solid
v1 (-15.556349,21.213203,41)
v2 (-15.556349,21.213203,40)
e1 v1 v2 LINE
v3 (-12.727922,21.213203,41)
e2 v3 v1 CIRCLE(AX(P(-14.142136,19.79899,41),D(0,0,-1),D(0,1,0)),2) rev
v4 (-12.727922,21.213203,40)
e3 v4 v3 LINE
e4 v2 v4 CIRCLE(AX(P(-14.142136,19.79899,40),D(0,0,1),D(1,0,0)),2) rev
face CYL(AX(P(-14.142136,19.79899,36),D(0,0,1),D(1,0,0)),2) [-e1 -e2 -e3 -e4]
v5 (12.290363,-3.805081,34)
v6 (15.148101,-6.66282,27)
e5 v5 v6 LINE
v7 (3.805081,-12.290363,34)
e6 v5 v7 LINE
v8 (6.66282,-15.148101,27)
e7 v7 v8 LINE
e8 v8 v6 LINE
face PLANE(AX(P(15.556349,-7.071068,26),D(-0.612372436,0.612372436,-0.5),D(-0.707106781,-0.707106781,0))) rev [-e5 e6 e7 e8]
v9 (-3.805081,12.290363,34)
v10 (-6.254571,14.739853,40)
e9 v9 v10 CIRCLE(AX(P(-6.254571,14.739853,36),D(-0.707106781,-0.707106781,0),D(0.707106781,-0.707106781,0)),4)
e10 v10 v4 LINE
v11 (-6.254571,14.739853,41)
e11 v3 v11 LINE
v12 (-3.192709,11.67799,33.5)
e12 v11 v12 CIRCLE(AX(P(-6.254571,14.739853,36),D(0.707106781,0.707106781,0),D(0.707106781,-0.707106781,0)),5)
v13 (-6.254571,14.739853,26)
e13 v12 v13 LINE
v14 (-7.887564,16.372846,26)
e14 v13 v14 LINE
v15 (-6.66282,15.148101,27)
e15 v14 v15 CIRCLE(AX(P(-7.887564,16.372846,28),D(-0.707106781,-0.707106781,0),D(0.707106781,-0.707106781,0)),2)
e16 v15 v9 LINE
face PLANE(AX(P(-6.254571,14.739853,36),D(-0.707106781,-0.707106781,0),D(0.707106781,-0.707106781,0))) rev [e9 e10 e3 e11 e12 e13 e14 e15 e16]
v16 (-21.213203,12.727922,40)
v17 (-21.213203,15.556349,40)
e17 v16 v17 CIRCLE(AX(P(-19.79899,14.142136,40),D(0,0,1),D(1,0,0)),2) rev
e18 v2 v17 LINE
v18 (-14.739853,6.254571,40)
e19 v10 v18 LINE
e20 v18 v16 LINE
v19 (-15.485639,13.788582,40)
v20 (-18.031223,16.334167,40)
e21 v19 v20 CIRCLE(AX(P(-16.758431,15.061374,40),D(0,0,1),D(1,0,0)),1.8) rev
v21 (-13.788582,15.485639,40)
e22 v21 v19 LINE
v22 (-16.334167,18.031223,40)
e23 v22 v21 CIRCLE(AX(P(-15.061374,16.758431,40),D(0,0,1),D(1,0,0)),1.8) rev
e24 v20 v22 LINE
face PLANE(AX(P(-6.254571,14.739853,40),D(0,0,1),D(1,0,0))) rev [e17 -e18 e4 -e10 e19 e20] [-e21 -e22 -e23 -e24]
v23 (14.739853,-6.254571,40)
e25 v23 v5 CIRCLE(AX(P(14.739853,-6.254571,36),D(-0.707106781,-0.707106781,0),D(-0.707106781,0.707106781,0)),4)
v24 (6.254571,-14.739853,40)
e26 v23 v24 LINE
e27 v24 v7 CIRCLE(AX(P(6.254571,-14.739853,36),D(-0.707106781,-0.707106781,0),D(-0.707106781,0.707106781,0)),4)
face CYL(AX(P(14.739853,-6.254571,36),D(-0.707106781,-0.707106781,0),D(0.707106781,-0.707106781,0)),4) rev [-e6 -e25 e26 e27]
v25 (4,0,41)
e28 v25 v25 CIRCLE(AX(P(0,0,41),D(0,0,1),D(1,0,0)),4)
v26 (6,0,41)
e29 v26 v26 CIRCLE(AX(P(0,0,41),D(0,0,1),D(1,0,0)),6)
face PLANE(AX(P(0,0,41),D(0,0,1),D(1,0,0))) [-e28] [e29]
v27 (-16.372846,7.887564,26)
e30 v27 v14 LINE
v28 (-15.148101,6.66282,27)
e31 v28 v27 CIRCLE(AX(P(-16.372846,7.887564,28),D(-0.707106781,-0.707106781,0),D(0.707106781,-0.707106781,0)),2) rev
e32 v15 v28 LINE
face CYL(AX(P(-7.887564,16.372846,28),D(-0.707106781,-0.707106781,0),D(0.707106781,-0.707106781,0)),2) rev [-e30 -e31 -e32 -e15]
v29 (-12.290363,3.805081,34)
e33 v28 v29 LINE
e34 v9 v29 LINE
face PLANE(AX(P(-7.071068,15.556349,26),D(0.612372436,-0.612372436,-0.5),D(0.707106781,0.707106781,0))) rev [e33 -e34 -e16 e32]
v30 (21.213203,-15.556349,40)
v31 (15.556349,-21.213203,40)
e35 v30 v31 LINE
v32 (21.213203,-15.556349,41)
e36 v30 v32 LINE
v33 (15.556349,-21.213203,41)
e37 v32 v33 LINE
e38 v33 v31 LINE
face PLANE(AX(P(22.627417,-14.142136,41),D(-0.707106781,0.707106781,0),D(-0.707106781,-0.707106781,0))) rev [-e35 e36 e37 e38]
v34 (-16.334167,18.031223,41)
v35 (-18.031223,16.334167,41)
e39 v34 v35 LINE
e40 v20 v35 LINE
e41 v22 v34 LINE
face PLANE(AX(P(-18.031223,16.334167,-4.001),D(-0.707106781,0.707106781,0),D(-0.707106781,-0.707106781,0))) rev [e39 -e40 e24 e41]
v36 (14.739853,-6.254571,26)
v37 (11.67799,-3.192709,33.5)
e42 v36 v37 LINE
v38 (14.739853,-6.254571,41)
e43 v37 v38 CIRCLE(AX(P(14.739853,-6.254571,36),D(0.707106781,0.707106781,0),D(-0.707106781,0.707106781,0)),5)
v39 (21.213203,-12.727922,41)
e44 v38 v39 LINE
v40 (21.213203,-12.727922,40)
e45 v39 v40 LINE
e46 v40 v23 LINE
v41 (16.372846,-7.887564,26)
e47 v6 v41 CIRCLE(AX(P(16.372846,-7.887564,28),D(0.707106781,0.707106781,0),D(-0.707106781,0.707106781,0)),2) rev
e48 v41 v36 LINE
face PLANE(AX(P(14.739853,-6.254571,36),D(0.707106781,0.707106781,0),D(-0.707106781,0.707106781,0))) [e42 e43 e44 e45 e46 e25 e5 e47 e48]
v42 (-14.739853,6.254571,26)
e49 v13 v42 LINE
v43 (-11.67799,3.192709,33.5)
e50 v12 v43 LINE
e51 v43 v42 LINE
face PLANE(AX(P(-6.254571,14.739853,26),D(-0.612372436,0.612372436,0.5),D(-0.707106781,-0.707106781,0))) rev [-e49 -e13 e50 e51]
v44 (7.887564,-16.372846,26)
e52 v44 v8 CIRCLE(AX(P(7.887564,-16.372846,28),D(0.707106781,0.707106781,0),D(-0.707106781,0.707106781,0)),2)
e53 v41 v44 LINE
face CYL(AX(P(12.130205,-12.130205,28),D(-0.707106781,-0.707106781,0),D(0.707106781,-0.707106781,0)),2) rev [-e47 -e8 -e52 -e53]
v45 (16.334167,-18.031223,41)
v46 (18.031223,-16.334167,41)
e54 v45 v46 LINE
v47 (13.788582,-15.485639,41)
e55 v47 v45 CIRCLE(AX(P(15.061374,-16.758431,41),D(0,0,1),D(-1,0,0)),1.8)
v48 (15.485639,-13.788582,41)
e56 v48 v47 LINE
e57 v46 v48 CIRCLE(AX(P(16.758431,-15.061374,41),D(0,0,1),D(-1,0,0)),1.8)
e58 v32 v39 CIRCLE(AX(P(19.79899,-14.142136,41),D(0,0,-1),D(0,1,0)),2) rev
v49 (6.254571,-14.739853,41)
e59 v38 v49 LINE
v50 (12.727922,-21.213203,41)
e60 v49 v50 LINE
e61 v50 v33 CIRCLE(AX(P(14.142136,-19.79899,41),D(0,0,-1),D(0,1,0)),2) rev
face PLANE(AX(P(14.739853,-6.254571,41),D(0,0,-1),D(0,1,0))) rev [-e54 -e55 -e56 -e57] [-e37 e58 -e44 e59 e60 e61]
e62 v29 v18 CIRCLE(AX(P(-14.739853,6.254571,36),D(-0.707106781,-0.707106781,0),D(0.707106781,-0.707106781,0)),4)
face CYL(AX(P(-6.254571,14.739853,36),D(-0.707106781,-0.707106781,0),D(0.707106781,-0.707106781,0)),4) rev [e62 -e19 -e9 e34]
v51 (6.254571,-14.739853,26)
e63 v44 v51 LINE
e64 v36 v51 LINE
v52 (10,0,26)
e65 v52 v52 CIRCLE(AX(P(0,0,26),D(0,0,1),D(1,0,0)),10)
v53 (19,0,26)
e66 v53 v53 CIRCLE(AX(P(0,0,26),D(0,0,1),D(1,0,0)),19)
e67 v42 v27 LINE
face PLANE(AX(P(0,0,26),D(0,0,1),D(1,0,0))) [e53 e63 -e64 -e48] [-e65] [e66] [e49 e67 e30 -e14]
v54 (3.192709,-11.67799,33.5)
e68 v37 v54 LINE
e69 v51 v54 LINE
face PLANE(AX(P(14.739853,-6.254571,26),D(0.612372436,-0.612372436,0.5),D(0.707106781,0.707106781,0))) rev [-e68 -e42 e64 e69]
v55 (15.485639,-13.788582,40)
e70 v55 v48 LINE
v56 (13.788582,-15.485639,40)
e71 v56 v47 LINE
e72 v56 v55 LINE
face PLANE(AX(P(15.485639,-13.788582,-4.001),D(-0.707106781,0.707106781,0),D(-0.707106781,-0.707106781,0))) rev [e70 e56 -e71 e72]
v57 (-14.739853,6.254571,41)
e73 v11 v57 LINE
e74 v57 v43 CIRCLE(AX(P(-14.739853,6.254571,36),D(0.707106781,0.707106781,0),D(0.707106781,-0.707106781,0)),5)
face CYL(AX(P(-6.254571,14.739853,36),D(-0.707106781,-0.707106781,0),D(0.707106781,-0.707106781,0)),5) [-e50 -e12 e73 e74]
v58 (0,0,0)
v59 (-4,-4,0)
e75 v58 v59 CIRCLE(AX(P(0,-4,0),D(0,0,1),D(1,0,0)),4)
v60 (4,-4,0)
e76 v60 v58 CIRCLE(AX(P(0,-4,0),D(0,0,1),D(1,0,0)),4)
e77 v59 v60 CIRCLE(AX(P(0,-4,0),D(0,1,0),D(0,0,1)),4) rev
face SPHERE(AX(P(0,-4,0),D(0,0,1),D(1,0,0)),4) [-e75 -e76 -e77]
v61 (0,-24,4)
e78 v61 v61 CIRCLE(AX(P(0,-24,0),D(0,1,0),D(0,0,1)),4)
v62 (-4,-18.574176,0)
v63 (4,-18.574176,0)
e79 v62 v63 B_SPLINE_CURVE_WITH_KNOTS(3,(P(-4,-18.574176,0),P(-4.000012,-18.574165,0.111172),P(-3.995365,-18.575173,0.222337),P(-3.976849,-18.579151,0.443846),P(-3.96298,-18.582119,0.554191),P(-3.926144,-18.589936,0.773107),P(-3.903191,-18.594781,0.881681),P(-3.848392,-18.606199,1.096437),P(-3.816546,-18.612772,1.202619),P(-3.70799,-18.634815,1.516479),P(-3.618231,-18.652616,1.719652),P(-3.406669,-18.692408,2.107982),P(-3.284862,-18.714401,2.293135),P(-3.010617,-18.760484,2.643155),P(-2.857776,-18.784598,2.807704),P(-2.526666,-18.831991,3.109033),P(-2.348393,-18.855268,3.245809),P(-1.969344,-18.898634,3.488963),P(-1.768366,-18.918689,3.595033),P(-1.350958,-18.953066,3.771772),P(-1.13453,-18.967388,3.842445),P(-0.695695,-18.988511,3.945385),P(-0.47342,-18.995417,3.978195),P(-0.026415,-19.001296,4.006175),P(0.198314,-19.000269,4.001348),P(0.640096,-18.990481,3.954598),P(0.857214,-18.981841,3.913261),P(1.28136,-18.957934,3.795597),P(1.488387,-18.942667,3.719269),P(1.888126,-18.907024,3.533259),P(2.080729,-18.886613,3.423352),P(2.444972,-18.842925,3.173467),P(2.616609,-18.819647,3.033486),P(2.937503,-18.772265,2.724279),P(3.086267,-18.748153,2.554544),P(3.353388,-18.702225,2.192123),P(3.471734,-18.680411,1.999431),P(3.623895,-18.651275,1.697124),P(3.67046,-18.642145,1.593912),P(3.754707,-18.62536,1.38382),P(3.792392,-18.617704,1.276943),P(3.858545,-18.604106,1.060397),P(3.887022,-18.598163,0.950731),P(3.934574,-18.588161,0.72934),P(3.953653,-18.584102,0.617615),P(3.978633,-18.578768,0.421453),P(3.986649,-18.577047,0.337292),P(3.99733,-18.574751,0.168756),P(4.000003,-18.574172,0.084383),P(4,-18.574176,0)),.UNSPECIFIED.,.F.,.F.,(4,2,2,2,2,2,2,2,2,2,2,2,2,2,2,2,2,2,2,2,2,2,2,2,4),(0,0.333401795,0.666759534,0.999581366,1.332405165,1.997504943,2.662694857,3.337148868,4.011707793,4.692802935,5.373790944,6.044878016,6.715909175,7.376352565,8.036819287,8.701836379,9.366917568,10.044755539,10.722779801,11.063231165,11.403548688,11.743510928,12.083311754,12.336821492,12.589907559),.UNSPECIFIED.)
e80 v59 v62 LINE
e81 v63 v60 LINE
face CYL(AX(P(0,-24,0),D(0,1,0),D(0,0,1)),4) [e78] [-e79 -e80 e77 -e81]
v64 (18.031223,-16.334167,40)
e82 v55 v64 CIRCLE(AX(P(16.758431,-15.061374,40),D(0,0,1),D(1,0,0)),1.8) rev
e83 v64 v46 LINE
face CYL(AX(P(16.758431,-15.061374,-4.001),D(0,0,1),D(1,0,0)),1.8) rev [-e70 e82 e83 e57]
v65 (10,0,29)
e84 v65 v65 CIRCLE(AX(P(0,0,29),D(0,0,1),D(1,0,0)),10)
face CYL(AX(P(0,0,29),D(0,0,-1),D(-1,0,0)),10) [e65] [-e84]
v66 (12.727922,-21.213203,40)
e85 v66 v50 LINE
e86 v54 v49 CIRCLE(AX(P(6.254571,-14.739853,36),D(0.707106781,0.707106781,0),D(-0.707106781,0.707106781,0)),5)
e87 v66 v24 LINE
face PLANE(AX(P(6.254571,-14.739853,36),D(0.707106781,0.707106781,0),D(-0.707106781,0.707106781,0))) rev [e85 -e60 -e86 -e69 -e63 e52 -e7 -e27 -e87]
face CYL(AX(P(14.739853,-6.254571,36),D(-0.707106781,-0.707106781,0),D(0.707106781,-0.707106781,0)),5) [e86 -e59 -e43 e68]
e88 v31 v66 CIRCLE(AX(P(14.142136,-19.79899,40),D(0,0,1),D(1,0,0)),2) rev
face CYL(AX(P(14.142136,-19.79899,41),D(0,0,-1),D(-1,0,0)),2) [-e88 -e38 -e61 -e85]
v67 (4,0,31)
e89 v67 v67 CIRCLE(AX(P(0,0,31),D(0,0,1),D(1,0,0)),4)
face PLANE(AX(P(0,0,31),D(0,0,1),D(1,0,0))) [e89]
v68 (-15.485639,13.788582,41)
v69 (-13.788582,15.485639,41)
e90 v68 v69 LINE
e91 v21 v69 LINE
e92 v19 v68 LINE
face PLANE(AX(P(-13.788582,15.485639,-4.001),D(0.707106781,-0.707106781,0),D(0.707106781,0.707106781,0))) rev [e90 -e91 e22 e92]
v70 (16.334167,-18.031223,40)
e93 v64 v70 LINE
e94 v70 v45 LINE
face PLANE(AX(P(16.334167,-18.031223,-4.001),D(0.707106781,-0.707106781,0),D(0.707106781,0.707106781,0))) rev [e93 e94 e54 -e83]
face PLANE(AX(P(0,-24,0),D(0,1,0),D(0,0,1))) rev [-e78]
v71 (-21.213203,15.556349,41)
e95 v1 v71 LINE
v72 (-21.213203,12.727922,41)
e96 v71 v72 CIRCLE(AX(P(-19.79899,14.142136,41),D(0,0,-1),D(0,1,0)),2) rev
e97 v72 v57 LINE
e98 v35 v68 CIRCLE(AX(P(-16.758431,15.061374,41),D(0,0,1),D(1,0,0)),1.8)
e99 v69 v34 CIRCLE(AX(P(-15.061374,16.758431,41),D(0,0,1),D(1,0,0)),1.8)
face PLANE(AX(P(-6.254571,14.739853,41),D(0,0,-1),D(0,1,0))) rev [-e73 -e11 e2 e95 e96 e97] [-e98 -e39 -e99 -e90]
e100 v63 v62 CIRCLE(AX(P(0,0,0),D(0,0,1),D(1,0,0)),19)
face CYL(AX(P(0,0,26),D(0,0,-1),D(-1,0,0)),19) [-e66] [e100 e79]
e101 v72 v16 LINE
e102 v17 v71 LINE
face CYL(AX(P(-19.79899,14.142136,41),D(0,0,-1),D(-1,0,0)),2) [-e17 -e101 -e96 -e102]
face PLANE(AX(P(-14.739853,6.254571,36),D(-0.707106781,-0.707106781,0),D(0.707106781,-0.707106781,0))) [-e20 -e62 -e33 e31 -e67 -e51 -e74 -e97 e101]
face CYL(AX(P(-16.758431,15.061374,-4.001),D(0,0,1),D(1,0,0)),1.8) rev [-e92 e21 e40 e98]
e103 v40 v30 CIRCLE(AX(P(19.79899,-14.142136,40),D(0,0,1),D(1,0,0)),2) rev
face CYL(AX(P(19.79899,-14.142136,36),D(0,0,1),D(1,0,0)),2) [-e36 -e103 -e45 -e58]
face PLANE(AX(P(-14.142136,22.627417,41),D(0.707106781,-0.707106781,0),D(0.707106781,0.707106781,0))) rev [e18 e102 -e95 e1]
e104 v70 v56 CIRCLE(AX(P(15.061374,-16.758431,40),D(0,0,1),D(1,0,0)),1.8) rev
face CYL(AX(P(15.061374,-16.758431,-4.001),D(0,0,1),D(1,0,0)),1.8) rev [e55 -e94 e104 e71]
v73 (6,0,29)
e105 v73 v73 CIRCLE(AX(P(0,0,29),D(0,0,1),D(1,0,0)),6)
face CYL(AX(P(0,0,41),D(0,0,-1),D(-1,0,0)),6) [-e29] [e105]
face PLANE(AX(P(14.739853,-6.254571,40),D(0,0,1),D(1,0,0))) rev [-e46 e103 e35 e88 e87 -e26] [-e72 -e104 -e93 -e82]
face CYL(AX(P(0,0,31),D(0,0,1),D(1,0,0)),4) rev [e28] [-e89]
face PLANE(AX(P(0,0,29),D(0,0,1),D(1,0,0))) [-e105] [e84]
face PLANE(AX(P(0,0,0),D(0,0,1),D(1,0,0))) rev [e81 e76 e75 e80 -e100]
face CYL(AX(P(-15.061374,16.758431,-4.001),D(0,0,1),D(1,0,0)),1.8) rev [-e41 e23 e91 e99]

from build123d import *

# Parameters (mm, degrees)
SKETCH1_R           = 19
BOSS_EXTRUDE1_DEPTH = 26
SKETCH2_R           = 10
BOSS_EXTRUDE2_DEPTH = 3
SKETCH3_R           = 6
BOSS_EXTRUDE3_DEPTH = 12
SKETCH4_R           = 4
CUT_EXTRUDE1_DEPTH  = 10
SKETCH5_R           = 4
BOSS_EXTRUDE4_DEPTH = 24
FILLET1_R           = 4
BOSS_EXTRUDE5_DEPTH = 6
CUT_EXTRUDE2_REACH  = 57.794
FILLET2_R           = 2
FILLET3_R           = 2


with BuildPart() as part:
    # Sketch1 → Boss-Extrude1 (new body)
    with BuildSketch(Plane.XY):
        with Locations(Location((0, 0, 0), (0, 0, 180))):
            Circle(SKETCH1_R)
    extrude(amount=BOSS_EXTRUDE1_DEPTH)

    # Sketch2 → Boss-Extrude2 (add)
    with BuildSketch(Plane.XY.offset(26)):
        Circle(SKETCH2_R)
    extrude(amount=BOSS_EXTRUDE2_DEPTH)

    # Sketch3 → Boss-Extrude3 (add)
    with BuildSketch(Plane.XY.offset(29)):
        Circle(SKETCH3_R)
    extrude(amount=BOSS_EXTRUDE3_DEPTH)

    # Sketch4 → Cut-Extrude1 (cut)
    with BuildSketch(Plane.XY.offset(41)):
        Circle(SKETCH4_R)
    extrude(amount=-CUT_EXTRUDE1_DEPTH, mode=Mode.SUBTRACT)

    # Sketch5 → Boss-Extrude4 (add)
    with BuildSketch(Plane(origin=(0, 0, 0), x_dir=(1, 0, 0), z_dir=(0, 1, 0))):
        with Locations(Location((0, 0, 0), (0, 0, 270))):
            Circle(SKETCH5_R)
    extrude(amount=-BOSS_EXTRUDE4_DEPTH)

    # Fillet1
    fillet1_edges = [part.edges().sort_by_distance(p)[0] for p in [
        (0, 0, -4),
    ]]
    fillet(fillet1_edges, radius=FILLET1_R - 0.0001)  # a hair under: the kernel refuses the full size

    # Sketch6 → Boss-Extrude5 (add, symmetric)
    with BuildSketch(Plane(origin=(0, 0, 0), x_dir=(-0.7071067811865464, 0.7071067811865488, 0), z_dir=(0.7071067811865488, 0.7071067811865464, 0))):
        with BuildLine():
            Line((-14.845299462, 26), (-10.515172443, 33.5))
            ThreePointArc((-10.515172443, 33.5), (-10.515172443, 38.5), (-14.845299462, 41))
            Line((-14.845299462, 41), (-26, 41))
            Line((-26, 41), (-26, 40))
            Line((-26, 40), (-14.845299462, 40))
            ThreePointArc((-14.845299462, 40), (-11.381197846, 38), (-11.381197846, 34))
            Line((-11.381197846, 34), (-16, 26))
            Line((-16, 26), (-14.845299462, 26))
        make_face()
        with BuildLine():
            Line((26, 41), (26, 40))
            Line((26, 40), (14.845299462, 40))
            ThreePointArc((14.845299462, 40), (11.381197846, 38), (11.381197846, 34))
            Line((11.381197846, 34), (16, 26))
            Line((16, 26), (14.845299462, 26))
            Line((14.845299462, 26), (10.515172443, 33.5))
            ThreePointArc((10.515172443, 33.5), (10.515172443, 38.5), (14.845299462, 41))
            Line((14.845299462, 41), (26, 41))
        make_face()
    extrude(amount=BOSS_EXTRUDE5_DEPTH, both=True)

    # Sketch7 → Cut-Extrude2 (cut, up to next)
    with BuildSketch(Plane.XY.offset(41), mode=Mode.PRIVATE) as cut_extrude2_sk1:
        with BuildLine():
            Line((-18.03122292, 16.334166645), (-16.334166645, 18.03122292))
            ThreePointArc((-16.334166645, 18.03122292), (-13.788582233, 18.03122292), (-13.788582233, 15.485638508))
            Line((-13.788582233, 15.485638508), (-15.485638508, 13.788582233))
            ThreePointArc((-15.485638508, 13.788582233), (-18.03122292, 13.788582233), (-18.03122292, 16.334166645))
        make_face()
    cut_extrude2_tool1 = extrude(cut_extrude2_sk1.sketch, amount=-CUT_EXTRUDE2_REACH, mode=Mode.PRIVATE) & part.part
    # Sketch7 → Cut-Extrude2 (cut, up to next)
    with BuildSketch(Plane.XY.offset(41), mode=Mode.PRIVATE) as cut_extrude2_sk2:
        with BuildLine():
            Line((15.485638508, -13.788582233), (13.788582233, -15.485638508))
            ThreePointArc((13.788582233, -15.485638508), (13.788582233, -18.03122292), (16.334166645, -18.03122292))
            Line((16.334166645, -18.03122292), (18.03122292, -16.334166645))
            ThreePointArc((18.03122292, -16.334166645), (18.03122292, -13.788582233), (15.485638508, -13.788582233))
        make_face()
    cut_extrude2_tool2 = extrude(cut_extrude2_sk2.sketch, amount=-CUT_EXTRUDE2_REACH, mode=Mode.PRIVATE) & part.part
    add(cut_extrude2_tool1.solids().sort_by_distance((-15.909903, 15.909903, 41))[0], mode=Mode.SUBTRACT)
    add(cut_extrude2_tool2.solids().sort_by_distance((15.909903, -15.909903, 41))[0], mode=Mode.SUBTRACT)

    # Fillet2
    fillet2_edges = [part.edges().sort_by_distance(p)[0] for p in [
        (14.142135624, -22.627416998, 40.5),
        (22.627416998, -14.142135624, 40.5),
        (-22.627416998, 14.142135624, 40.5),
        (-14.142135624, 22.627416998, 40.5),
    ]]
    fillet(fillet2_edges, radius=FILLET2_R)

    # Fillet3
    fillet3_edges = [part.edges().sort_by_distance(p)[0] for p in [
        (11.313708499, -11.313708499, 26),
        (-11.313708499, 11.313708499, 26),
    ]]
    fillet(fillet3_edges, radius=FILLET3_R)


solid = part.part
